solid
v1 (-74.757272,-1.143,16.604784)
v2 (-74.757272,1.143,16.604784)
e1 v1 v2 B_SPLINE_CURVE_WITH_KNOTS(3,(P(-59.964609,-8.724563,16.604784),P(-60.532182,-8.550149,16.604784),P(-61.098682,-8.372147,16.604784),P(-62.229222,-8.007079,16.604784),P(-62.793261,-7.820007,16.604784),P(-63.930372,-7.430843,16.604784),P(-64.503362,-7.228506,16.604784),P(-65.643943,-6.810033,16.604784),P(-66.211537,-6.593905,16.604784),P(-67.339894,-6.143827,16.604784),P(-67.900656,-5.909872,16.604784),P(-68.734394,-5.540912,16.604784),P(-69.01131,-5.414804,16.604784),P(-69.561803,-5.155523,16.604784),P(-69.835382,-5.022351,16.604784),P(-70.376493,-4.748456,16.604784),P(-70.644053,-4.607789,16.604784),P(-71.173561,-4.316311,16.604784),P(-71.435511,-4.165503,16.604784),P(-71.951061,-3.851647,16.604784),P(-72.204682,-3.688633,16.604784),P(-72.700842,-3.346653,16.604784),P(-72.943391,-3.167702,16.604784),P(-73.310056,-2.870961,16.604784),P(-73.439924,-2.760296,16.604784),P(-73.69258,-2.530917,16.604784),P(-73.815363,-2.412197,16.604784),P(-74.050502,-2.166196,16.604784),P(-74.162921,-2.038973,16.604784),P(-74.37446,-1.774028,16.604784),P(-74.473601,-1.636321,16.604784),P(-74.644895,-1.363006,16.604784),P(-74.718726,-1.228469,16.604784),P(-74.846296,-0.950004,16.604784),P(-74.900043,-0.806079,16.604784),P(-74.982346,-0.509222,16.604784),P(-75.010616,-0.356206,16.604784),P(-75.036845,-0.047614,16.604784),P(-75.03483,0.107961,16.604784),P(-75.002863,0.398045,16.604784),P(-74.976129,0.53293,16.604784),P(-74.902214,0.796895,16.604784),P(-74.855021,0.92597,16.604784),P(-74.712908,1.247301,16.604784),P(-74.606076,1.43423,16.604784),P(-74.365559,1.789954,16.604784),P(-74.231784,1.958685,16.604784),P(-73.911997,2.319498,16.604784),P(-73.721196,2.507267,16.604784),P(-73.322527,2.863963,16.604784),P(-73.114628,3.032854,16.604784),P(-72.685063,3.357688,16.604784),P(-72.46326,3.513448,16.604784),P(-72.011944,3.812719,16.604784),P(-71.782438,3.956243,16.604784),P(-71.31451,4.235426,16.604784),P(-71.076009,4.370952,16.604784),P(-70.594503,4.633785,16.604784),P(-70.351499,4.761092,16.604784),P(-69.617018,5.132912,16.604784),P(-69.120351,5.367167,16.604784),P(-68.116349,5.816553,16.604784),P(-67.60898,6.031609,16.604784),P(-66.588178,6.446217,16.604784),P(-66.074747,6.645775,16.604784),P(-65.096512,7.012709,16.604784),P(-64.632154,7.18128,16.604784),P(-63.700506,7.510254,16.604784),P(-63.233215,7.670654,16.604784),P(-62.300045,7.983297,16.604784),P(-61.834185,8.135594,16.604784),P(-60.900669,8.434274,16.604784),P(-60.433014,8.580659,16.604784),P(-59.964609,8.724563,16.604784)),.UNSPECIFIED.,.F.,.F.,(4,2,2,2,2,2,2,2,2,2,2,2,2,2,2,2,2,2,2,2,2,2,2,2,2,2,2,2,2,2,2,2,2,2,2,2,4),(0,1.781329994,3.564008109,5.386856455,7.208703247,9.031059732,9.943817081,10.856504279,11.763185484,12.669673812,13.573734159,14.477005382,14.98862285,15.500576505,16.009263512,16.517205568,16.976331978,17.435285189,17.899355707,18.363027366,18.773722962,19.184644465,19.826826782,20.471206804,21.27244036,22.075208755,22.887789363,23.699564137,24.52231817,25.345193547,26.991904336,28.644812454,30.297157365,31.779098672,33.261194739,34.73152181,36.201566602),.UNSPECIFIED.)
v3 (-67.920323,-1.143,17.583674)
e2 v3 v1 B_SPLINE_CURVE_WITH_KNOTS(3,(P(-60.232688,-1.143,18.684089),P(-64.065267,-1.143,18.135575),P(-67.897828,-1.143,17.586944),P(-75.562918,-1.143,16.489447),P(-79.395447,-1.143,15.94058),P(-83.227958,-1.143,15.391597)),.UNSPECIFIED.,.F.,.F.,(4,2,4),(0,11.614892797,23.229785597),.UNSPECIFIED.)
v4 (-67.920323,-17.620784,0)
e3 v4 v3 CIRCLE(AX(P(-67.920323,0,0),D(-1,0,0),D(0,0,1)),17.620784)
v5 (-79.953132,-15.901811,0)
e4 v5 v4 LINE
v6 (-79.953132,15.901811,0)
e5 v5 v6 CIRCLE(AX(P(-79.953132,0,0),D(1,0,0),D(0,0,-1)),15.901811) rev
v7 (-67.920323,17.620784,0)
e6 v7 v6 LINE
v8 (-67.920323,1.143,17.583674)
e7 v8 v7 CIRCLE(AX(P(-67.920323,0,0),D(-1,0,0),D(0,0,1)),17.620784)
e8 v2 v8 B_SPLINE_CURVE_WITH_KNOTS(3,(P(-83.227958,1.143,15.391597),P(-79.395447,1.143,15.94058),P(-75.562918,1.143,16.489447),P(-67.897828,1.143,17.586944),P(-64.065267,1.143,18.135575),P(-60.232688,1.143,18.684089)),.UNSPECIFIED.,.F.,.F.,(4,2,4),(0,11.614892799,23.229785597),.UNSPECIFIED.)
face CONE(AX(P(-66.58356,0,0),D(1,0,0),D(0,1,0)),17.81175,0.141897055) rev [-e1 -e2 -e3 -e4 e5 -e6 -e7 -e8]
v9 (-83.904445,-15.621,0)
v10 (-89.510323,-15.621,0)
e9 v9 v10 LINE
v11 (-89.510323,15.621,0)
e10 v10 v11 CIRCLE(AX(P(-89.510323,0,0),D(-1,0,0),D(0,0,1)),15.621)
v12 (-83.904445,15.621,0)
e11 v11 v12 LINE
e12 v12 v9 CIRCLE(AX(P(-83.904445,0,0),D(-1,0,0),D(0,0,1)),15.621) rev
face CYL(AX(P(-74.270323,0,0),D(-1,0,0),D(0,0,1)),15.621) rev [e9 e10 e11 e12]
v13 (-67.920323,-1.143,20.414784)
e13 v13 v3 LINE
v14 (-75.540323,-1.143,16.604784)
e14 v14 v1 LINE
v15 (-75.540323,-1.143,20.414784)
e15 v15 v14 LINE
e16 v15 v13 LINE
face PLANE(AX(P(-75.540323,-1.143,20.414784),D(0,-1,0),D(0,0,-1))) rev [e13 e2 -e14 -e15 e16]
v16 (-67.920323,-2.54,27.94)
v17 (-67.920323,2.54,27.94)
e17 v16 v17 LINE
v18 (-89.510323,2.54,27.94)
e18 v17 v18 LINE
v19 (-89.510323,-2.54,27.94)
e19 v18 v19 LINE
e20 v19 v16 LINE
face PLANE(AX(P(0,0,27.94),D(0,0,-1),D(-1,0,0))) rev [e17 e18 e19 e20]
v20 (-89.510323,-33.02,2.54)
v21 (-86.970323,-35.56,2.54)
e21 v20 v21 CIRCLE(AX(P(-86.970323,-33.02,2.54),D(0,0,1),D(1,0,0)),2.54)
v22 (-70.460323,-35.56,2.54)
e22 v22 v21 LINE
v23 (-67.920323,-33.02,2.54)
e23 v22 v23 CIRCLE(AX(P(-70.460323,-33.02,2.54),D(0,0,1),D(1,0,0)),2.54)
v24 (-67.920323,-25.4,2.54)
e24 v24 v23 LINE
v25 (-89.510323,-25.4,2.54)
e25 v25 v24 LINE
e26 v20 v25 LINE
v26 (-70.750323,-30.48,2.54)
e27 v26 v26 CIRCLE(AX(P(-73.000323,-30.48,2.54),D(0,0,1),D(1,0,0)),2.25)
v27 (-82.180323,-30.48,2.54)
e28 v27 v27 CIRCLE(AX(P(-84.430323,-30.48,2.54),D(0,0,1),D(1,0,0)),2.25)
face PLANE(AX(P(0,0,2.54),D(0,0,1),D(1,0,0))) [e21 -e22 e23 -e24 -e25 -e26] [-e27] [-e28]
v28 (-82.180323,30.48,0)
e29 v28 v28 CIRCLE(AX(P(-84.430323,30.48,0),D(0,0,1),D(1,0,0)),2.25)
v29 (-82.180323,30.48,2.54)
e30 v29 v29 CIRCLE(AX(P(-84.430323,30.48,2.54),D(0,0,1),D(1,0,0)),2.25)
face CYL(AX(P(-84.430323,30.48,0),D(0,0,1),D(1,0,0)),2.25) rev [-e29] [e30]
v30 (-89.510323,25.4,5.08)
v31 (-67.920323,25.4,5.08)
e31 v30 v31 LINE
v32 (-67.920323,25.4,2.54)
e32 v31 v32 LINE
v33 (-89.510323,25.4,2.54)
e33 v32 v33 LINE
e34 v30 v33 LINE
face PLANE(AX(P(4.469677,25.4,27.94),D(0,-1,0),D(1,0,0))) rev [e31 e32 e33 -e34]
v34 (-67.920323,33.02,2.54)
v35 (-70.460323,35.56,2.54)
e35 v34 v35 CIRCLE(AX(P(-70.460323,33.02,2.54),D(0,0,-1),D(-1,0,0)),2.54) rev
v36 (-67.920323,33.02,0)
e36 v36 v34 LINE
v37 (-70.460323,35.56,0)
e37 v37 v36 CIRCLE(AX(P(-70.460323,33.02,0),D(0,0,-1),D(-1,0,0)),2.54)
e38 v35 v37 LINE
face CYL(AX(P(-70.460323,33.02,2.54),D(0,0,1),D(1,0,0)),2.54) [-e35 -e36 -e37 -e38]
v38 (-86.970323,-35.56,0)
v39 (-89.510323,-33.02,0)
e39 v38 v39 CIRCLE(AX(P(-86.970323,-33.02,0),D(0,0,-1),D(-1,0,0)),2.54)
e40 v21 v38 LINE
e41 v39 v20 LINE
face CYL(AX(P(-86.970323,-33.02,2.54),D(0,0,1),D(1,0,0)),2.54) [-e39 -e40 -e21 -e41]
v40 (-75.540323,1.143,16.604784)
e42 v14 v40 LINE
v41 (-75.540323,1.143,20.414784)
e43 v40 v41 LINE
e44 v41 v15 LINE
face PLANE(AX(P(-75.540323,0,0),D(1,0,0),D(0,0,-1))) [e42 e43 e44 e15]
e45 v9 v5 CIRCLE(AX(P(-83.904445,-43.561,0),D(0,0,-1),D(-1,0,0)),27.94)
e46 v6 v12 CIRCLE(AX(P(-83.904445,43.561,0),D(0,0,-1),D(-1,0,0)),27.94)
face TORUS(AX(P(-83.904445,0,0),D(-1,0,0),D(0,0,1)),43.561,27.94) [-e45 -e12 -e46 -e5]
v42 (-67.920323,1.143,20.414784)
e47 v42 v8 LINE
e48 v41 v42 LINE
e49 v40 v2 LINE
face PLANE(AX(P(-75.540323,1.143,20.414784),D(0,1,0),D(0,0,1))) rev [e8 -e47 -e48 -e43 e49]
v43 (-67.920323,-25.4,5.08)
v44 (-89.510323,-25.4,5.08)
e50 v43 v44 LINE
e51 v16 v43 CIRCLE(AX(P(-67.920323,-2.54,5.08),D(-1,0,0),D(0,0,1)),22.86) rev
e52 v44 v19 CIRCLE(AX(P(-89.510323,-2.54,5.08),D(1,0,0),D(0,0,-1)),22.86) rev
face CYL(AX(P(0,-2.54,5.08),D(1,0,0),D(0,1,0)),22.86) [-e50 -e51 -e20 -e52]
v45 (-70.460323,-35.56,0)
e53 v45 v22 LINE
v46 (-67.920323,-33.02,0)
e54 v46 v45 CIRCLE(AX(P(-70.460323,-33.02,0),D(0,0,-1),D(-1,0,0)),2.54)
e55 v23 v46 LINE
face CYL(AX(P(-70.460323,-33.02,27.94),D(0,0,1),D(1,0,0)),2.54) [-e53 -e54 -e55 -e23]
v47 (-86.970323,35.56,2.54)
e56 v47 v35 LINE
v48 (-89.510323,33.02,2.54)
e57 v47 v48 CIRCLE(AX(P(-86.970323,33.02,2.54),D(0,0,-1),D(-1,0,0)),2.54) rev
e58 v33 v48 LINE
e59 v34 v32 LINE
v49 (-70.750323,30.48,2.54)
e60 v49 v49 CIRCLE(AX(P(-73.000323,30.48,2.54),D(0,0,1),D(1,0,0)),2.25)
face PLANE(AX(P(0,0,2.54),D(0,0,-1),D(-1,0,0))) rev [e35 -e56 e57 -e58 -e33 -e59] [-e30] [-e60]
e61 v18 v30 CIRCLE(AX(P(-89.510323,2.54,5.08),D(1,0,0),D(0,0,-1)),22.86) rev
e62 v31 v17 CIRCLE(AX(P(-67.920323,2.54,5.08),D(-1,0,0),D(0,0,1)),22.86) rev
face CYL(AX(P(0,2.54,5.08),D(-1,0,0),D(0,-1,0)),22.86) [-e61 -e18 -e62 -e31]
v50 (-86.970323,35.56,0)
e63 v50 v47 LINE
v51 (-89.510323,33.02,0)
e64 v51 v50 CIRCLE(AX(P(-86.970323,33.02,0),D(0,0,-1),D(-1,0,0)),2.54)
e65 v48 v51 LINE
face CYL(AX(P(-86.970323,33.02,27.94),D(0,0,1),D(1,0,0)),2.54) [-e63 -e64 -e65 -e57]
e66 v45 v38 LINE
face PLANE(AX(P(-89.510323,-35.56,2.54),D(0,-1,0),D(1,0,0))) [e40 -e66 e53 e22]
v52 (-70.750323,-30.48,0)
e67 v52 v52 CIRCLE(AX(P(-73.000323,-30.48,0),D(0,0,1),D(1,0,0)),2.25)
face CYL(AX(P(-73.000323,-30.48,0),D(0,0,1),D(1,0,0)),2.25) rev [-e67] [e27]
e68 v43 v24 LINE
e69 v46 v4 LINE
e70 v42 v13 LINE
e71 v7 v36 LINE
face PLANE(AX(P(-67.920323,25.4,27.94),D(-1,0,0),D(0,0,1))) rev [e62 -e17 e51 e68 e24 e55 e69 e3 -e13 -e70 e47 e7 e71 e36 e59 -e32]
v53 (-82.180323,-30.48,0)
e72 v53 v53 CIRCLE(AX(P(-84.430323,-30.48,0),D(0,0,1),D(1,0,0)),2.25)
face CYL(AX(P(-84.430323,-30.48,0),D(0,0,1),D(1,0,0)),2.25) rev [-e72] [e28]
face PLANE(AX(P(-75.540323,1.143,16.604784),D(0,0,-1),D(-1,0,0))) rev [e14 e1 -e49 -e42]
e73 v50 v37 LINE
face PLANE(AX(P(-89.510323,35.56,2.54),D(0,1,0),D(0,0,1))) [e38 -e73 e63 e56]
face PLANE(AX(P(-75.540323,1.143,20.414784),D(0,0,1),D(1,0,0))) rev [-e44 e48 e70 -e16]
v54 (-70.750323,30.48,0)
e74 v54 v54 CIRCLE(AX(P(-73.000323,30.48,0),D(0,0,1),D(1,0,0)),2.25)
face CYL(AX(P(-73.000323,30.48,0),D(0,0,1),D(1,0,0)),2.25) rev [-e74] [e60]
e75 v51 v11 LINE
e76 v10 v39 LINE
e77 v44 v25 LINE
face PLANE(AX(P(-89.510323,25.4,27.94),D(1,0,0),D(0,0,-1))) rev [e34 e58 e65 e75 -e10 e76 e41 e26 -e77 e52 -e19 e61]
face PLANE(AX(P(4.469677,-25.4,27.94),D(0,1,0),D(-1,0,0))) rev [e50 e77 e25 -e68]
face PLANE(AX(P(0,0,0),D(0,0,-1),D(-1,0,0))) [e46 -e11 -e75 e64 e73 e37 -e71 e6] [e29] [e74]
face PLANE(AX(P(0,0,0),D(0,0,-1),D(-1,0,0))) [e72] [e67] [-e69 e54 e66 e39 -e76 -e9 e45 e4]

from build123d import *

# Parameters (mm, degrees)
SKETCH3_W           = 93.98
SKETCH3_H           = 50.8
BOSS_EXTRUDE1_DEPTH = 27.94
SKETCH4_W           = 72.39
SKETCH4_H           = 50.8
CUT_EXTRUDE1_DEPTH  = 27.94
FILLET1_R           = 22.86
SKETCH5_W           = 21.59
SKETCH5_H           = 10.16
BOSS_EXTRUDE2_DEPTH = 2.54
FILLET2_R           = 2.54
SKETCH6_R           = 2.249999945
CUT_EXTRUDE2_DEPTH  = 2.54
SKETCH7_W           = 3.81
SKETCH7_H           = 2.286
CUT_EXTRUDE3_DEPTH  = 7.62
SKETCH8_R           = 15.621
CUT_EXTRUDE4_DEPTH  = 15.24
FILLET3_R           = 27.94


# Read off the part's stored shape, not the designer's step: Cavity1
with BuildPart() as part:
    # Sketch3 → Boss-Extrude1 (new body)
    with BuildSketch(Plane.XY):
        with Locations((-42.520322955, 0)):
            Rectangle(SKETCH3_W, SKETCH3_H)
    extrude(amount=BOSS_EXTRUDE1_DEPTH)

    # Cavity1 outline → Cavity1 (revolve, cut)
    with BuildSketch(Plane.YX):
        with BuildLine():
            Line((0, -89.510322955), (14.536498149, -89.510322955))
            Line((14.536498149, -89.510322955), (17.81175, -66.58356))
            Line((17.81175, -66.58356), (6.477, -66.58356))
            Line((6.477, -66.58356), (6.477, -17.35836))
            Line((6.477, -17.35836), (23.05812, -17.35836))
            ThreePointArc((23.05812, -17.35836), (21.288451872, -10.075162449), (18.689240956, -3.045169955))
            ThreePointArc((18.689240956, -3.045169955), (17.939550019, -2.064315438), (16.821043187, -1.541769218))
            ThreePointArc((16.821043187, -1.541769218), (11.026301594, -0.582300423), (5.1816, 0))
            Line((5.1816, 0), (4.864997876, 4.469677045))
            Line((4.864997876, 4.469677045), (0, 4.469677045))
            Line((0, 4.469677045), (0, -89.510322955))
        make_face()
    revolve(axis=Axis((0, 0, 0), (1, 0, 0)), mode=Mode.SUBTRACT)

    # Sketch4 → Cut-Extrude1 (cut)
    with BuildSketch(Plane(origin=(0, 0, 0), x_dir=(-1, 0, 0), z_dir=(0, 0, -1))):
        with Locations((31.725322955, 0)):
            Rectangle(SKETCH4_W, SKETCH4_H)
    extrude(amount=-CUT_EXTRUDE1_DEPTH, mode=Mode.SUBTRACT)

    # Fillet1
    fillet1_edges = [part.edges().sort_by_distance(p)[0] for p in [
        (-78.715322955, 25.4, 27.94),
        (-78.715322955, -25.4, 27.94),
    ]]
    fillet(fillet1_edges, radius=FILLET1_R)

    # Sketch5 → Boss-Extrude2 (add)
    with BuildSketch(Plane(origin=(0, 0, 0), x_dir=(-1, 0, 0), z_dir=(0, 0, -1))):
        with Locations((78.715322955, 30.48)):
            Rectangle(SKETCH5_W, SKETCH5_H)
        with Locations((78.715322955, -30.48)):
            Rectangle(SKETCH5_W, SKETCH5_H)
    extrude(amount=-BOSS_EXTRUDE2_DEPTH)

    # Fillet2
    fillet2_edges = [part.edges().sort_by_distance(p)[0] for p in [
        (-89.510322955, 35.56, 1.27),
        (-67.920322955, 35.56, 1.27),
        (-89.510322955, -35.56, 1.27),
        (-67.920322955, -35.56, 1.27),
    ]]
    fillet(fillet2_edges, radius=FILLET2_R)

    # Sketch6 → Cut-Extrude2 (cut)
    with BuildSketch(Plane.XY.offset(2.54)):
        with Locations((-84.430322955, 30.48)):
            Circle(SKETCH6_R)
        with Locations((-73.000322955, 30.48)):
            Circle(SKETCH6_R)
        with Locations((-84.430322955, -30.48)):
            Circle(SKETCH6_R)
        with Locations((-73.000322955, -30.48)):
            Circle(SKETCH6_R)
    extrude(amount=-CUT_EXTRUDE2_DEPTH, mode=Mode.SUBTRACT)

    # Sketch7 → Cut-Extrude3 (cut)
    with BuildSketch(Plane(origin=(-67.920322955, 0, 0), x_dir=(0, 0, -1), z_dir=(1, 0, 0))):
        with Locations((-18.509783864, 0)):
            Rectangle(SKETCH7_W, SKETCH7_H)
    extrude(amount=-CUT_EXTRUDE3_DEPTH, mode=Mode.SUBTRACT)

    # Sketch8 → Cut-Extrude4 (cut)
    with BuildSketch(Plane.ZY.offset(89.510322955)):
        Circle(SKETCH8_R)
    extrude(amount=-CUT_EXTRUDE4_DEPTH, mode=Mode.SUBTRACT)

    # Fillet3
    fillet3_edges = [part.edges().sort_by_distance(p)[0] for p in [
        (-81.918809999, 0, 15.621),
    ]]
    fillet(fillet3_edges, radius=FILLET3_R)


solid = part.part
